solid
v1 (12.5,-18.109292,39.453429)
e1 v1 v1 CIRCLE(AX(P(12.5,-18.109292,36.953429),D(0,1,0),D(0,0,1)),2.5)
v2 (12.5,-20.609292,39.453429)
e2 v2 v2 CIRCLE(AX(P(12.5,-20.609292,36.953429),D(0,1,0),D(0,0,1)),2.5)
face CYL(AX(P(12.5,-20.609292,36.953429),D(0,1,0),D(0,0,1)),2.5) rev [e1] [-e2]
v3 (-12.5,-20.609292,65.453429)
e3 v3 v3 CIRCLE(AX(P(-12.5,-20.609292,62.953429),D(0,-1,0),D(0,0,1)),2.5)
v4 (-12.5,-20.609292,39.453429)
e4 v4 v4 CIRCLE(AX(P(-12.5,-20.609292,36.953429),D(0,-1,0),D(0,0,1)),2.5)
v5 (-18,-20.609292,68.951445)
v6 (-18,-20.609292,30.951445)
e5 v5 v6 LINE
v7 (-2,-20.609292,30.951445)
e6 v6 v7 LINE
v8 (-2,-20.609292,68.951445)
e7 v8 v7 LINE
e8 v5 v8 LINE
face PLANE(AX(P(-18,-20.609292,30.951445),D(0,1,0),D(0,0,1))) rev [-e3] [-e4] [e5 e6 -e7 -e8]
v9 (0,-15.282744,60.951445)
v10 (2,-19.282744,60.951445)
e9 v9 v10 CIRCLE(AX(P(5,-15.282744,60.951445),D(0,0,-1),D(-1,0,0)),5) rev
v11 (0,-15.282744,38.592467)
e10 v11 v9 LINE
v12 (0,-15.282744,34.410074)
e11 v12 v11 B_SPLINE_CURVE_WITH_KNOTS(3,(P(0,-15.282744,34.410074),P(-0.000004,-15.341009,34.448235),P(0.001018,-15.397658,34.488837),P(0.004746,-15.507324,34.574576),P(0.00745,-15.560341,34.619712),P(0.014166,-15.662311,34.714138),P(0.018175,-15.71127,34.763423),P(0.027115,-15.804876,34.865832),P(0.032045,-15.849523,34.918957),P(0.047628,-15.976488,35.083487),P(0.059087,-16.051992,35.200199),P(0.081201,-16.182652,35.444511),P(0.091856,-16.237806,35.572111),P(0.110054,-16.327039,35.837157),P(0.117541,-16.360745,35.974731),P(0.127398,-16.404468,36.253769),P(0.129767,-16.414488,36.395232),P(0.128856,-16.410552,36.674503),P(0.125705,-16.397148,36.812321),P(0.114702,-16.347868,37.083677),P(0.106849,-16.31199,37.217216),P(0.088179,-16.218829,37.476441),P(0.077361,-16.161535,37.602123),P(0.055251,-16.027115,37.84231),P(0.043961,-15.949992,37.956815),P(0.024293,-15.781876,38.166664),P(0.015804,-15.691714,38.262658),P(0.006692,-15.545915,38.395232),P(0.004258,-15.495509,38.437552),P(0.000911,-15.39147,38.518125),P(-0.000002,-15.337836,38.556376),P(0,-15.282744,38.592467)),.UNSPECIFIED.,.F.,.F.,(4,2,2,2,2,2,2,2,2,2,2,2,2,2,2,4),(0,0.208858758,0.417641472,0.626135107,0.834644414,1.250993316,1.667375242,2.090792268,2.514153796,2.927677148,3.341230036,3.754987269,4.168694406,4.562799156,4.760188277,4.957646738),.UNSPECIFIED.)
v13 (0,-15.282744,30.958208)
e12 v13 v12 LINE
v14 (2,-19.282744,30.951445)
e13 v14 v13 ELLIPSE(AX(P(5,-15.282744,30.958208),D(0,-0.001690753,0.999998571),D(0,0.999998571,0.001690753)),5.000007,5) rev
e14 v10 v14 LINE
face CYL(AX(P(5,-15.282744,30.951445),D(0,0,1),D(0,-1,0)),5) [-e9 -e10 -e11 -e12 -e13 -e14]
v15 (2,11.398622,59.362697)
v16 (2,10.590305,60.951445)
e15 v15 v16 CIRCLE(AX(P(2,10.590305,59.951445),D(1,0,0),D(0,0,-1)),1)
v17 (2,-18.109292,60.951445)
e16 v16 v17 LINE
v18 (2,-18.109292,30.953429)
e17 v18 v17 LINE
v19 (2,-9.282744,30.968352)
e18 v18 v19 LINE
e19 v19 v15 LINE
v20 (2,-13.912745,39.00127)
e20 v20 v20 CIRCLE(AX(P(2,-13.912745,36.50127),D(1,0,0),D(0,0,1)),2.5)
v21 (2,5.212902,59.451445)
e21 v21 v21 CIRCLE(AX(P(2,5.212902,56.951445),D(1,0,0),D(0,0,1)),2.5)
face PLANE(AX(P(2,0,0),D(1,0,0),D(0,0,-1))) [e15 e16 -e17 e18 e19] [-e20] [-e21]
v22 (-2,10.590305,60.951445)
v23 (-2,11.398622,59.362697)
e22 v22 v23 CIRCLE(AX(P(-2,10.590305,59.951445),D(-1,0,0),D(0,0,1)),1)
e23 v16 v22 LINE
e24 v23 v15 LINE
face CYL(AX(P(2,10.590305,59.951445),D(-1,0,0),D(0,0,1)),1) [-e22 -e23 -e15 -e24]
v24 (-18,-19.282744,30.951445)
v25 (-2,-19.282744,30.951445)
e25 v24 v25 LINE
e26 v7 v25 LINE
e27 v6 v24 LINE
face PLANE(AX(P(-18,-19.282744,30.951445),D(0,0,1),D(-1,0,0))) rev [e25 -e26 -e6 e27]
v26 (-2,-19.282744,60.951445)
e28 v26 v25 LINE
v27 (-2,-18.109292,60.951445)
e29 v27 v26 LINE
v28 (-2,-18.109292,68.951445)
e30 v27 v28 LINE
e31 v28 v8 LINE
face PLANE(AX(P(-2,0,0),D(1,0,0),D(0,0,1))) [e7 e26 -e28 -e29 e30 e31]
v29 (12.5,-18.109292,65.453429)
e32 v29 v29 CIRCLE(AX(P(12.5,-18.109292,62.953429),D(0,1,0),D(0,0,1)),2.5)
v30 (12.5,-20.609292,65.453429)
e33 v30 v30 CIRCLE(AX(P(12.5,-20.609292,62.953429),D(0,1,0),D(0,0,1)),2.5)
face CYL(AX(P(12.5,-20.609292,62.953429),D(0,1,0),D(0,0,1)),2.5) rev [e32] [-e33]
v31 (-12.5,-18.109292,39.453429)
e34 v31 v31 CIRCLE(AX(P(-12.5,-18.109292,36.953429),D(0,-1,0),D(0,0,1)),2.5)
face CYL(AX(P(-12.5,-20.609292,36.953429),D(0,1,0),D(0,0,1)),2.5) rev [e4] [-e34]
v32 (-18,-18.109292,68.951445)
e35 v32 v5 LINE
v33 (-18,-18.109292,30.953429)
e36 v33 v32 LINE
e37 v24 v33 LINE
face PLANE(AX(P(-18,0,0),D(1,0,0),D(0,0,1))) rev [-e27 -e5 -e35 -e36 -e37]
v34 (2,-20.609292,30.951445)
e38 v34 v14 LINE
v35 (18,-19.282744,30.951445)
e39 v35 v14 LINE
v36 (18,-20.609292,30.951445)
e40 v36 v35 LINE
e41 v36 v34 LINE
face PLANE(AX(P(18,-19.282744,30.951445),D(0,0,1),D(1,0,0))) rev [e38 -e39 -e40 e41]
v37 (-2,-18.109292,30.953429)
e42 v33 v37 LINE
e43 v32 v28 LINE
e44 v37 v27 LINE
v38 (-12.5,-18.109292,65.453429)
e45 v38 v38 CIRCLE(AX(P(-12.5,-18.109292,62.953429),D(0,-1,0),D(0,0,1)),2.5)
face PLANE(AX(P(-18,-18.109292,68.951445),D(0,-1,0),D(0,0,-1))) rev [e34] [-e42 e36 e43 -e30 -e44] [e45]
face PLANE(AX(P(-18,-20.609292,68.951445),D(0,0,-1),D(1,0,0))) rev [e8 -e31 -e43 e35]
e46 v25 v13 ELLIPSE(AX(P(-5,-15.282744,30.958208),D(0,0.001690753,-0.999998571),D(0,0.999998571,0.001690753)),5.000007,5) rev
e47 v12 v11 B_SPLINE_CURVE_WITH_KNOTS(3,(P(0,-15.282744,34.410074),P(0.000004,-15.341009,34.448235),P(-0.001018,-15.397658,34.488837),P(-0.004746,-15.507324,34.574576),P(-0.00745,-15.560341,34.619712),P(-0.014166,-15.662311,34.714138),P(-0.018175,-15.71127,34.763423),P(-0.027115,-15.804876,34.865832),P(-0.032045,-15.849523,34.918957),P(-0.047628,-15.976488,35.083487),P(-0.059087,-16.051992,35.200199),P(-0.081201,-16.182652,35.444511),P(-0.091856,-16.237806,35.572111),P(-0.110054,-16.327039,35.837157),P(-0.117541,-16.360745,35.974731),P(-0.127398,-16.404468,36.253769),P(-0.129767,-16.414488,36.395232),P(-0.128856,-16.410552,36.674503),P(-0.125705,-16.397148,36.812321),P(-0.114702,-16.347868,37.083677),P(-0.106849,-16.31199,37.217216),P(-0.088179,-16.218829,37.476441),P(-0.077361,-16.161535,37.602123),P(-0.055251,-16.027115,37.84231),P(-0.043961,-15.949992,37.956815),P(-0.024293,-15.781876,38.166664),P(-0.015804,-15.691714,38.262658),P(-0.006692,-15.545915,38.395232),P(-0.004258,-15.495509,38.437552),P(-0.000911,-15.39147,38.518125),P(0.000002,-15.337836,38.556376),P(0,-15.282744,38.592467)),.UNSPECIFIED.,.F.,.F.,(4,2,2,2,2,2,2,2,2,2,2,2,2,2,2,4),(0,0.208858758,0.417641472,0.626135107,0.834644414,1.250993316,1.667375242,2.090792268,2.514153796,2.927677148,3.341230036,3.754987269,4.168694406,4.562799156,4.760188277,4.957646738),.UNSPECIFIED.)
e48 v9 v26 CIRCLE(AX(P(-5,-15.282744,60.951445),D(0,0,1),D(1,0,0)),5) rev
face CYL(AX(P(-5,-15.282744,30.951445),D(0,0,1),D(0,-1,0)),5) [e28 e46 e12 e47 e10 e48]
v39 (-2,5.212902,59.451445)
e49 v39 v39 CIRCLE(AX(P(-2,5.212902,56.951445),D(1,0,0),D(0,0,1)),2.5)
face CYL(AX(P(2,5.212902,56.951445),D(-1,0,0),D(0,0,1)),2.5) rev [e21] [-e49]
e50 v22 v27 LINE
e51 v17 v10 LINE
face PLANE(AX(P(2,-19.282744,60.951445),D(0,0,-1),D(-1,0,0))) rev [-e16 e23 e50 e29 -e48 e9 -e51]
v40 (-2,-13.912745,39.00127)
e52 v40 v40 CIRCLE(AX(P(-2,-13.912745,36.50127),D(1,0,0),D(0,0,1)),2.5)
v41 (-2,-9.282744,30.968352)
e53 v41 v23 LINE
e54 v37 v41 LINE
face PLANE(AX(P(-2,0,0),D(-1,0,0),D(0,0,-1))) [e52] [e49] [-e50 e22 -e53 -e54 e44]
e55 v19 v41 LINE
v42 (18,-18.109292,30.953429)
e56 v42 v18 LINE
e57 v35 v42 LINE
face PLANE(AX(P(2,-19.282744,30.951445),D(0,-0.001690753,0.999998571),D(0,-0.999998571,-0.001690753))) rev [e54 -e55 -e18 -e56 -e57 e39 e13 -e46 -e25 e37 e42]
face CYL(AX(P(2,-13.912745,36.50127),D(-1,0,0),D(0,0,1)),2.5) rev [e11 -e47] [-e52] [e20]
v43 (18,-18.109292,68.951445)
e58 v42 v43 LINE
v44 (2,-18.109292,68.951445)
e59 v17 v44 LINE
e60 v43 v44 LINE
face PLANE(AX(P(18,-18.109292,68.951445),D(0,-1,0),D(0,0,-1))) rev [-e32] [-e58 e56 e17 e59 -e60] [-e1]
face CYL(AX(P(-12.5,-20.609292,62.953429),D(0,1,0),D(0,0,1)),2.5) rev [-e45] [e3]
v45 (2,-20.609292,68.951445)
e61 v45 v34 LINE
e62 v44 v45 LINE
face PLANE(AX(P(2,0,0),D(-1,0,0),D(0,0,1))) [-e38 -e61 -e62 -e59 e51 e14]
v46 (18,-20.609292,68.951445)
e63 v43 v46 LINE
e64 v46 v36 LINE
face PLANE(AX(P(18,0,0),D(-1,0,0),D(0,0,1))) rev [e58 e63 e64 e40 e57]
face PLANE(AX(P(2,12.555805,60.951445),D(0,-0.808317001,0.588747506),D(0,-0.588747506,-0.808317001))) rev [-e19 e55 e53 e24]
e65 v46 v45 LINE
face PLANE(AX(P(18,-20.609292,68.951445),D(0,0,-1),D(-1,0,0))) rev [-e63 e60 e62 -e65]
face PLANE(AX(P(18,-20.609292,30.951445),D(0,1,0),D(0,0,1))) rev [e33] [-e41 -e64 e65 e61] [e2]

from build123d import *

# Parameters (mm, degrees)
SKETCH1_R            = 2.5
BOSS_EXTRUDE2_DEPTH  = 2
BOSS_EXTRUDE4_DEPTH  = 16
FILLET1_R            = 5
FILLET1_OF_MIRROR1_R = 5
SKETCH3_R            = 2.5
CUT_EXTRUDE2_DEPTH   = 78.57995838
FILLET2_R            = 1


with BuildPart() as part:
    # Sketch1 → Boss-Extrude2 (new body)
    with BuildSketch(Plane(origin=(0, 0, 0), x_dir=(0, 0, -1), z_dir=(1, 0, 0))):
        Polygon((-60.951444932, 12.55580533), (-30.968352486, -9.282744271), (-30.951444932, -19.282744271), (-60.951444932, -19.282744271), align=None)
        with Locations(Location((-36.501270434, -13.912745065, 0), (0, 0, 180))):
            Circle(SKETCH1_R, mode=Mode.SUBTRACT)
        with Locations(Location((-56.951444932, 5.21290167, 0), (0, 0, 180))):
            Circle(SKETCH1_R, mode=Mode.SUBTRACT)
    boss_extrude2 = extrude(amount=BOSS_EXTRUDE2_DEPTH)

    # Sketch2 → Boss-Extrude4 (add)
    with BuildSketch(Plane(origin=(2, 0, 0), x_dir=(0, 0, -1), z_dir=(1, 0, 0))):
        Polygon((-68.951444932, -20.609291835), (-68.951444932, -19.609291835), (-68.951444932, -18.109291835), (-30.953428953, -18.109291835), (-30.951444932, -19.282744271), (-30.951444932, -20.609291835), align=None)
    boss_extrude4 = extrude(amount=BOSS_EXTRUDE4_DEPTH)

    # Fillet1
    # the kernel refuses this fillet: 5 mm, written as the material it takes off along each edge
    with BuildSketch(Plane(origin=(0, -19.282744271, 20.951444932), x_dir=(0, 1, 0), z_dir=(0, 0, 1))) as fillet1_piece_1:
        with BuildLine():
            CenterArc((4, -5), FILLET1_R, 90, 53.130102354)
            Line((0, -2), (-0.08, -1.94))
            ThreePointArc((-0.08, -1.94), (-0.1, -1), (-0.1, 0))
            Line((-0.1, 0), (0, 0.1))
            Line((0, 0.1), (4, 0.1))
            Line((4, 0.1), (4, 0))
        make_face()
    extrude(amount=50, mode=Mode.SUBTRACT)


with BuildPart() as mirror1_1:
    # Mirror1: Boss-Extrude2, Boss-Extrude4 across plane
    add(boss_extrude2.mirror(Plane(origin=(0, 0, 0), x_dir=(0, 0, 1), z_dir=(1, 0, 0))))
    add(boss_extrude4.mirror(Plane(origin=(0, 0, 0), x_dir=(0, 0, 1), z_dir=(1, 0, 0))))

    # Fillet1 of Mirror1
    # the kernel refuses this fillet: 5 mm, written as the material it takes off along each edge
    with BuildSketch(Plane(origin=(0, -19.282744271, 20.951444932), x_dir=(0, 1, 0), z_dir=(0, 0, 1))) as fillet1_of_mirror1_piece_1:
        with BuildLine():
            CenterArc((4, 5), FILLET1_OF_MIRROR1_R, 216.869897646, 53.130102354)
            Line((0, 2), (-0.08, 1.94))
            ThreePointArc((-0.08, 1.94), (-0.1, 1), (-0.1, 0))
            Line((-0.1, 0), (0, -0.1))
            Line((0, -0.1), (4, -0.1))
            Line((4, -0.1), (4, 0))
        make_face()
    extrude(amount=50, mode=Mode.SUBTRACT)


with BuildPart() as part_1:
    add(part.part)

    # Mirror1 united with what the copies touc: union Mirror1_1
    add(mirror1_1.part)

    # Sketch3 → Cut-Extrude2 (cut, through all)
    with BuildSketch(Plane(origin=(0, -18.109291835, 0), x_dir=(1, 0, 0), z_dir=(0, 1, 0))):
        with Locations(Location((12.5, -62.953428953, 0), (0, 0, 270))):
            Circle(SKETCH3_R)
        with Locations(Location((12.5, -36.953428953, 0), (0, 0, 270))):
            Circle(SKETCH3_R)
    cut_extrude2 = extrude(amount=-CUT_EXTRUDE2_DEPTH, mode=Mode.SUBTRACT)

    # Mirror2: Cut-Extrude2 across plane
    add(cut_extrude2.mirror(Plane(origin=(0, 0, 0), x_dir=(0, 0, 1), z_dir=(1, 0, 0))), mode=Mode.SUBTRACT)

    # Fillet2
    fillet2_edges = [part_1.edges().sort_by_distance(p)[0] for p in [
        (0, 12.55580533, 60.951444932),
    ]]
    fillet(fillet2_edges, radius=FILLET2_R)


solid = part_1.part
